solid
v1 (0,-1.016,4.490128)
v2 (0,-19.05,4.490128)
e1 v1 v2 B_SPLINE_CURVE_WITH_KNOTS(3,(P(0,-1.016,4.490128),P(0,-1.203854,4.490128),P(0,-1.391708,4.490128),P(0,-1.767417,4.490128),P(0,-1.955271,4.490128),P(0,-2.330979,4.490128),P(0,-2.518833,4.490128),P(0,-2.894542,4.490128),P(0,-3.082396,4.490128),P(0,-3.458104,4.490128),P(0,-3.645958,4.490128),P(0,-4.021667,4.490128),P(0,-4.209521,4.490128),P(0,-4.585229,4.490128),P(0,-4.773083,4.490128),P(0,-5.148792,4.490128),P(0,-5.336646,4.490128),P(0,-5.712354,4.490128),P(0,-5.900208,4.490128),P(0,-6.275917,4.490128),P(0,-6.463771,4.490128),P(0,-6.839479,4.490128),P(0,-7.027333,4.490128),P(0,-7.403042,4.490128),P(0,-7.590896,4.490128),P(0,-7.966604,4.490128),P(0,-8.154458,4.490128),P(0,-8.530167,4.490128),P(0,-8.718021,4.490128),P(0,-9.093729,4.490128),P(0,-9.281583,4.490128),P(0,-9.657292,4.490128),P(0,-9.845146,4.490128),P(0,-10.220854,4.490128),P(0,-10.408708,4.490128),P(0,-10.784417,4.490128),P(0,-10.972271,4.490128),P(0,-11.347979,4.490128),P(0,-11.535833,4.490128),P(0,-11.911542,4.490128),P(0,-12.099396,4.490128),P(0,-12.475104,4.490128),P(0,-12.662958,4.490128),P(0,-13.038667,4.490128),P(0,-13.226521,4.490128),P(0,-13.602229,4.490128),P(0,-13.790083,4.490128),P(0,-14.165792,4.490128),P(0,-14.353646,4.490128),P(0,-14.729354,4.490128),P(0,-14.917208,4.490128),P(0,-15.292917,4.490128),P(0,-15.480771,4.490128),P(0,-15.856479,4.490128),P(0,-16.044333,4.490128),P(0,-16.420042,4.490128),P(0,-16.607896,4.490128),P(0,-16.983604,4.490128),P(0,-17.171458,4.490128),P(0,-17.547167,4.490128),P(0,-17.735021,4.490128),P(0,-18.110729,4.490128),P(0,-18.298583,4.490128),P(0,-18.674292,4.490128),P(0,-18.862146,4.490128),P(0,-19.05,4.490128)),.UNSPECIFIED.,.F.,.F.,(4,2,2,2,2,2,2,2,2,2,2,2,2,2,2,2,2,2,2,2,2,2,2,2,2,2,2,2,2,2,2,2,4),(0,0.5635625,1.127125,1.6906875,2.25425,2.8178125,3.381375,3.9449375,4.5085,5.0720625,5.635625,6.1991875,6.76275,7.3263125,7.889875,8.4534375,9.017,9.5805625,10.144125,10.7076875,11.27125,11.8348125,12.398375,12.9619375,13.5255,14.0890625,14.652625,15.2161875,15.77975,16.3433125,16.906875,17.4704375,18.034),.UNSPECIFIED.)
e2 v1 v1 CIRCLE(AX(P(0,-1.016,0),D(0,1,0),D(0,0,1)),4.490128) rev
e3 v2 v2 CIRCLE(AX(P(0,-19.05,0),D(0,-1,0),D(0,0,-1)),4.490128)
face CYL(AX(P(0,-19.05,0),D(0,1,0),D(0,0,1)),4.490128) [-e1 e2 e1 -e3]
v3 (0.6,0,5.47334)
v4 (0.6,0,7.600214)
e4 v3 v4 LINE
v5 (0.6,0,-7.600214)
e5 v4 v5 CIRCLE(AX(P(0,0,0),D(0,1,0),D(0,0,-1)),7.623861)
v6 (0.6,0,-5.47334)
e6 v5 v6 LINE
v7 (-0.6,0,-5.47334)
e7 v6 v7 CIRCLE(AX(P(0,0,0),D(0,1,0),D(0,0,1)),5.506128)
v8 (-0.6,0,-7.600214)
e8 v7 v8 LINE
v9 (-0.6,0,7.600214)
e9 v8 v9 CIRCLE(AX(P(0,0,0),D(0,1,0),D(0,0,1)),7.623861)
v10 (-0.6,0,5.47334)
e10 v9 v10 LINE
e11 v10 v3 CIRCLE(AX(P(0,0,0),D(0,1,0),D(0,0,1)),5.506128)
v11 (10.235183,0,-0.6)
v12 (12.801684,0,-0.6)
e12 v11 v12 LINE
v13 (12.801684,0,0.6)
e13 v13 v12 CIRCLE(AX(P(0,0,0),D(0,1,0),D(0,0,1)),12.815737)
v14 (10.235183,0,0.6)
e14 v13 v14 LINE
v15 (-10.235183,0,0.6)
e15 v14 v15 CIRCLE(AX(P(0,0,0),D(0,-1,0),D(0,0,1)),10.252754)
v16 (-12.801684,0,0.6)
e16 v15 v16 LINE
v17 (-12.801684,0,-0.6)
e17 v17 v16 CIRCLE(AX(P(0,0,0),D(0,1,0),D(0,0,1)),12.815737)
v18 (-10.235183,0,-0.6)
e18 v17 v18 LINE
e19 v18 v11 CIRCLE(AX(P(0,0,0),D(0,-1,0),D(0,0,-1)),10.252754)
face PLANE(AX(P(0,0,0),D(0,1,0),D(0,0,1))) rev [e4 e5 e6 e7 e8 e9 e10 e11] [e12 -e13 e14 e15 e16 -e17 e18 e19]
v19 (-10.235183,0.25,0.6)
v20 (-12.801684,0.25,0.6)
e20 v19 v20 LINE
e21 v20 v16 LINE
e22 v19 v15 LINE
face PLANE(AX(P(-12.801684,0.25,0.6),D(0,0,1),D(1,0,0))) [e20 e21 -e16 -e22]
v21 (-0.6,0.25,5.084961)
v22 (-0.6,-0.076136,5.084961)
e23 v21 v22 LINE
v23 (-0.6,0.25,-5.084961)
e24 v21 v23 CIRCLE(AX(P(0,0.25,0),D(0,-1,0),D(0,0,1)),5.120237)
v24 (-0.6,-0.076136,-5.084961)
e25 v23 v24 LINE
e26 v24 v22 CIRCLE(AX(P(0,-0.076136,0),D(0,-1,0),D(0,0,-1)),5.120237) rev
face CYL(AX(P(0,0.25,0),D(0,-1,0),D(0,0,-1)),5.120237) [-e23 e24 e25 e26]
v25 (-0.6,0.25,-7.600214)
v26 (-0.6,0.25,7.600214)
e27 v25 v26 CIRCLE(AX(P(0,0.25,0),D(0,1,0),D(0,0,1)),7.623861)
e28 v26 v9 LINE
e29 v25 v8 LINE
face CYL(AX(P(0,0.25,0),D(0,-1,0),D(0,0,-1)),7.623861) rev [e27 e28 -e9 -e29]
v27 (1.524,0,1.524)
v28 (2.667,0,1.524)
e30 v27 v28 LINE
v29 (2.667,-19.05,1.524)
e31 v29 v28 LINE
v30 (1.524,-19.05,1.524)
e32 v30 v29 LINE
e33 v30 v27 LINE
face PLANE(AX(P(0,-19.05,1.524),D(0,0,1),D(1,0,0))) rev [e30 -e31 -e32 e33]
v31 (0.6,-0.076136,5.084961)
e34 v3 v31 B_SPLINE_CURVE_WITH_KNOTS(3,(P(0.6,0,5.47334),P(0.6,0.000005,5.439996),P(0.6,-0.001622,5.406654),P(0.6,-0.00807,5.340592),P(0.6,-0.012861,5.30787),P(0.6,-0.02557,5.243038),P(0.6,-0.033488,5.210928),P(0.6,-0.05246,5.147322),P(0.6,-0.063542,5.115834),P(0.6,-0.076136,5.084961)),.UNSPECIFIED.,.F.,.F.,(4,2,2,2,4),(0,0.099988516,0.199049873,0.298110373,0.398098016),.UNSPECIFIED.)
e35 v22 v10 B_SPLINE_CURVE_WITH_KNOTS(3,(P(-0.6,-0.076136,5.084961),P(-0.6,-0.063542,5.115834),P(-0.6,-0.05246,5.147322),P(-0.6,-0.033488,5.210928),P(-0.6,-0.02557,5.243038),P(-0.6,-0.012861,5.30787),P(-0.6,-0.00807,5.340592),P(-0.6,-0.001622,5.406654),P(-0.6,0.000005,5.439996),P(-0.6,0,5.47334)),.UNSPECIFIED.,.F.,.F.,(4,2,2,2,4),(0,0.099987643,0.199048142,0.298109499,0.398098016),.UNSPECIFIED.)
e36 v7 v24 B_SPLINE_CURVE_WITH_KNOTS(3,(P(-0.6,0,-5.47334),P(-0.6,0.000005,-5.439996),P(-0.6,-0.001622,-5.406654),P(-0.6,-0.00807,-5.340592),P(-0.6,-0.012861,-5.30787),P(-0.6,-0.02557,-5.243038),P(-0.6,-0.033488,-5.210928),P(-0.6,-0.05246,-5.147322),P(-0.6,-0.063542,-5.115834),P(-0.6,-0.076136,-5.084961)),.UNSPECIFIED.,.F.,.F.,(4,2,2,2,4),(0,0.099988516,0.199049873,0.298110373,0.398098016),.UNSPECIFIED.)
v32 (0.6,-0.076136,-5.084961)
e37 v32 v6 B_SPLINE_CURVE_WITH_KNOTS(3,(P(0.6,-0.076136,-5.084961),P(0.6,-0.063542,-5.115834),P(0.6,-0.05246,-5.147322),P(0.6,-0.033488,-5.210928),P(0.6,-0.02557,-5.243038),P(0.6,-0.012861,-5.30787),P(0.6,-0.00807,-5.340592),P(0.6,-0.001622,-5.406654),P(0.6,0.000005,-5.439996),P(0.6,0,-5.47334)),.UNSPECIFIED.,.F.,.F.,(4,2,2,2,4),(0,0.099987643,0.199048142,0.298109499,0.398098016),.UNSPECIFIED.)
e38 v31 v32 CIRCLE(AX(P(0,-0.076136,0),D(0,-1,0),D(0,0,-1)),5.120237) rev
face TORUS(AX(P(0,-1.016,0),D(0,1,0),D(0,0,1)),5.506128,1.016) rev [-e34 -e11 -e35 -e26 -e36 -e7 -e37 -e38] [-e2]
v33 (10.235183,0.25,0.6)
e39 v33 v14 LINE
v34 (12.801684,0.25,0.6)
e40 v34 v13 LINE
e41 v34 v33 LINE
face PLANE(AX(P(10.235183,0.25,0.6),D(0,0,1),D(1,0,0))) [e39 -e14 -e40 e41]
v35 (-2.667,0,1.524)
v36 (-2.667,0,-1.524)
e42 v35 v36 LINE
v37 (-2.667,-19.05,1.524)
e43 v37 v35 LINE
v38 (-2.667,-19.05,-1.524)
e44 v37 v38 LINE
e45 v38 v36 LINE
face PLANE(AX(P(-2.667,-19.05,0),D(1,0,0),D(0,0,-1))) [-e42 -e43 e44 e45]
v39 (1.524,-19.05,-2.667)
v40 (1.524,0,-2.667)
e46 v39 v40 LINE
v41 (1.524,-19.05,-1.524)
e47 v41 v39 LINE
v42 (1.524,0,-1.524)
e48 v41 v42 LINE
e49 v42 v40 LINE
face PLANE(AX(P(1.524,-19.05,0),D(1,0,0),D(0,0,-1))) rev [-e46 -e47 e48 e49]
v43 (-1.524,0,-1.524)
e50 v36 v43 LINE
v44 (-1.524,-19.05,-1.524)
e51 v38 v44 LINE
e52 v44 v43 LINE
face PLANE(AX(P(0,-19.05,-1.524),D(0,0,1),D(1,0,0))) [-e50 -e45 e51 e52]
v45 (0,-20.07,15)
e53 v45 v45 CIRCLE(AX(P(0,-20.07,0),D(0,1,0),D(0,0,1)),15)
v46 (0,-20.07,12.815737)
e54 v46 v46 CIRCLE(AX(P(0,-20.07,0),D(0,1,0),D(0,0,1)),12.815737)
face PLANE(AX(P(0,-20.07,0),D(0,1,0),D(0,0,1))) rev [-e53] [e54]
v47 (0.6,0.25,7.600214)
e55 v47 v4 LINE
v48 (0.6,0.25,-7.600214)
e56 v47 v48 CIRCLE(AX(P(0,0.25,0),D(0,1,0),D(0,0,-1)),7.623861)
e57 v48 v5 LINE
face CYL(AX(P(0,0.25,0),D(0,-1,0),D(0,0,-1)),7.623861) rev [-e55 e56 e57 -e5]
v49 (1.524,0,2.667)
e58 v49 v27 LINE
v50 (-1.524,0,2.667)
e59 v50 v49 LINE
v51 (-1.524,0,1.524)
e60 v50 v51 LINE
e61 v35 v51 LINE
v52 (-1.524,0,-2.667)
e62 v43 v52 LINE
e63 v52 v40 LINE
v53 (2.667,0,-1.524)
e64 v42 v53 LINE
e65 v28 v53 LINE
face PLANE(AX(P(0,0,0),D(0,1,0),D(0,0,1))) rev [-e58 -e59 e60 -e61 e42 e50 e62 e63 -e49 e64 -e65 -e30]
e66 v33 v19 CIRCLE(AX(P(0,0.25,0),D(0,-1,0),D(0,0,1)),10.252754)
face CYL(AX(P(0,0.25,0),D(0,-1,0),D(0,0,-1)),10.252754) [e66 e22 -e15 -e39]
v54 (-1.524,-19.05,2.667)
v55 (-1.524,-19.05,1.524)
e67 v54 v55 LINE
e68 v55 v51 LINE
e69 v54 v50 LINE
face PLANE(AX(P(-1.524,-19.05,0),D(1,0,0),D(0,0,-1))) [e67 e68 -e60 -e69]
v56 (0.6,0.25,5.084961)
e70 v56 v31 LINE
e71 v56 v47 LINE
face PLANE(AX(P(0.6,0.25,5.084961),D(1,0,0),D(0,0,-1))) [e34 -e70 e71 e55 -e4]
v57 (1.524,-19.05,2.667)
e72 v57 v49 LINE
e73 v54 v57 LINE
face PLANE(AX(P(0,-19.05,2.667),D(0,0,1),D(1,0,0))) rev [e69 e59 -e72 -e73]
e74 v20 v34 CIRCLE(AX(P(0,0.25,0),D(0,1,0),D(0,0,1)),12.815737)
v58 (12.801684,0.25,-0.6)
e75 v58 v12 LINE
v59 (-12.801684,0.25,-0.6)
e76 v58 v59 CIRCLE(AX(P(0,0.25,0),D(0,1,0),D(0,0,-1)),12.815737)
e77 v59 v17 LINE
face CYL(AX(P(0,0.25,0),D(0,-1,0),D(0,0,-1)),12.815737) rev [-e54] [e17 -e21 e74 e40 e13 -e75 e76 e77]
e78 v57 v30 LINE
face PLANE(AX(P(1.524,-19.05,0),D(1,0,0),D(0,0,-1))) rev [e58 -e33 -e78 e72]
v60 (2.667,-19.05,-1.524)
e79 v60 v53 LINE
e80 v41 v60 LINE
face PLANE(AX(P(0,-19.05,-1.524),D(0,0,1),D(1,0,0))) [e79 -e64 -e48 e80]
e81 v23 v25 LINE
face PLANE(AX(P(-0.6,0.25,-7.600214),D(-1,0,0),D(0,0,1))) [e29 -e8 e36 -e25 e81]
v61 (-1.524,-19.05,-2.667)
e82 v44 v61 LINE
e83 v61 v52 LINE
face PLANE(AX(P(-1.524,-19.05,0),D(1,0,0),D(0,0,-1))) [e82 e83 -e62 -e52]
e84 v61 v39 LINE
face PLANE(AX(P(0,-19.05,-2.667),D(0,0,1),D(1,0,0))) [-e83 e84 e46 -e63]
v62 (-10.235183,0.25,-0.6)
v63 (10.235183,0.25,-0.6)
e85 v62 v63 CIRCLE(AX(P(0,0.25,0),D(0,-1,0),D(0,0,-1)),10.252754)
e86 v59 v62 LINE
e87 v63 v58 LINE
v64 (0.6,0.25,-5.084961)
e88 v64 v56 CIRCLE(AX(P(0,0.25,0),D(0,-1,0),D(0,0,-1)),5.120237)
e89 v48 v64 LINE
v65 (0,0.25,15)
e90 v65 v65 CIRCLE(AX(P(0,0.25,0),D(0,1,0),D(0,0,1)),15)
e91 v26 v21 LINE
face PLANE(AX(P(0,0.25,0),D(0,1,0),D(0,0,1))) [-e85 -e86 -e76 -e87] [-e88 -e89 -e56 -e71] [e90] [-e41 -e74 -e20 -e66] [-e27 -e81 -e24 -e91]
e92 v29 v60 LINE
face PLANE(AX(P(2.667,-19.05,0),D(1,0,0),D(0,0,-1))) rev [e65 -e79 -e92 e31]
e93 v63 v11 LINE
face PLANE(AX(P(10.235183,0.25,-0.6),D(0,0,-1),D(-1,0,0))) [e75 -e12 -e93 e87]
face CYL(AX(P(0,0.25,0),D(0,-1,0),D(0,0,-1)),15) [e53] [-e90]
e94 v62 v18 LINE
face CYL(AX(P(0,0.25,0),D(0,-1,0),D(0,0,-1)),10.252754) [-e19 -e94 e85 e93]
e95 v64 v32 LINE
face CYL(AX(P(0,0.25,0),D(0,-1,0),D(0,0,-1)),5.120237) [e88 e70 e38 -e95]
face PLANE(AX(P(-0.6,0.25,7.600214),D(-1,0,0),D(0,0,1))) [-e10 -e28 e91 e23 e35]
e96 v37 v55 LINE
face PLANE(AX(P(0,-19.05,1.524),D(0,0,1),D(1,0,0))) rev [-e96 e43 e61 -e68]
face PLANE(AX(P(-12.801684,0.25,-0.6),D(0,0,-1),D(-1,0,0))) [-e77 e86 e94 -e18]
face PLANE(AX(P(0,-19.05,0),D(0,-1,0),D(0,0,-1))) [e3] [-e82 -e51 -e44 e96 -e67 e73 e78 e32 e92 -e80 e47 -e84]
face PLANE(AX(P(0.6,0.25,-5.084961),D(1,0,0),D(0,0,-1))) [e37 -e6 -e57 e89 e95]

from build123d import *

# Parameters (mm, degrees)
SKETCH1_R           = 15
BOSS_EXTRUDE1_DEPTH = 0.25
BOSS_EXTRUDE2_START = -20.32
SKETCH2_R           = 15
SKETCH2_R_2         = 12.815737343
BOSS_EXTRUDE2_DEPTH = 20.32
SKETCH3_R           = 4.490128061
BOSS_EXTRUDE3_DEPTH = 19.05
FILLET2_R           = 1.016


with BuildPart() as part:
    # Sketch1 → Boss-Extrude1 (new body)
    with BuildSketch(Plane(origin=(0, 0, 0), x_dir=(1, 0, 0), z_dir=(0, 1, 0))):
        with Locations(Location((0, 0, 0), (0, 0, 270))):
            Circle(SKETCH1_R)
        with BuildLine():
            Line((-12.801684406, 0.6), (-10.235182592, 0.6))
            ThreePointArc((-10.235182592, 0.6), (0, 10.252753907), (10.235182592, 0.6))
            Line((10.235182592, 0.6), (12.801684406, 0.6))
            ThreePointArc((12.801684406, 0.6), (0, 12.815737343), (-12.801684406, 0.6))
        make_face(mode=Mode.SUBTRACT)
        with BuildLine():
            Line((-0.6, 7.600213812), (-0.6, 5.084960781))
            ThreePointArc((-0.6, 5.084960781), (-5.120236922, 0), (-0.6, -5.084960781))
            Line((-0.6, -5.084960781), (-0.6, -7.600213812))
            ThreePointArc((-0.6, -7.600213812), (-7.623860569, 0), (-0.6, 7.600213812))
        make_face(mode=Mode.SUBTRACT)
        with BuildLine():
            Line((0.6, 5.084960781), (0.6, 7.600213812))
            ThreePointArc((0.6, 7.600213812), (7.623860569, 0), (0.6, -7.600213812))
            Line((0.6, -7.600213812), (0.6, -5.084960781))
            ThreePointArc((0.6, -5.084960781), (5.120236922, 0), (0.6, 5.084960781))
        make_face(mode=Mode.SUBTRACT)
        with BuildLine():
            Line((-12.801684406, -0.6), (-10.235182592, -0.6))
            ThreePointArc((-10.235182592, -0.6), (0, -10.252753907), (10.235182592, -0.6))
            Line((10.235182592, -0.6), (12.801684406, -0.6))
            ThreePointArc((12.801684406, -0.6), (0, -12.815737343), (-12.801684406, -0.6))
        make_face(mode=Mode.SUBTRACT)
    extrude(amount=BOSS_EXTRUDE1_DEPTH)

    # Sketch2 → Boss-Extrude2 (add)
    with BuildSketch(Plane(origin=(0, 0.25, 0), x_dir=(1, 0, 0), z_dir=(0, 1, 0)).offset(BOSS_EXTRUDE2_START)):
        with Locations(Location((0, 0, 0), (0, 0, 270))):
            Circle(SKETCH2_R)
        with Locations(Location((0, 0, 0), (0, 0, 2.683422553))):
            Circle(SKETCH2_R_2, mode=Mode.SUBTRACT)
    extrude(amount=BOSS_EXTRUDE2_DEPTH)

    # Sketch3 → Boss-Extrude3 (add)
    with BuildSketch(Plane.XZ):
        with Locations(Location((0, 0, 0), (0, 0, 90))):
            Circle(SKETCH3_R)
        Polygon((-1.524, 1.524), (-1.524, 2.667), (1.524, 2.667), (1.524, 1.524), (2.667, 1.524), (2.667, -1.524), (1.524, -1.524), (1.524, -2.667), (-1.524, -2.667), (-1.524, -1.524), (-2.667, -1.524), (-2.667, 1.524), align=None, mode=Mode.SUBTRACT)
    extrude(amount=BOSS_EXTRUDE3_DEPTH)

    # Fillet2
    # the kernel refuses this fillet: 1.016 mm, written as the material it adds along each edge
    with BuildSketch(Plane(origin=(0, 0, 0), x_dir=(0, 0, 1), z_dir=(1, 0, 0))) as fillet2_piece_1_section:
        with BuildLine():
            CenterArc((4.490128061 + FILLET2_R, FILLET2_R), FILLET2_R, 180, 90)
            Line((4.490128061, FILLET2_R), (4.490128061, 0))
            Line((4.490128061, 0), (4.490128061 + FILLET2_R, 0))
        make_face()
    fillet2_piece_1 = revolve(axis=Axis((0, 0, 0), (0, -1, 0)), mode=Mode.PRIVATE)
    fillet2_piece_1 = split(fillet2_piece_1, bisect_by=Plane(origin=(0.6, -0.022686873, 5.204418355), z_dir=(-1, 0, 0)), keep=Keep.TOP, mode=Mode.PRIVATE)
    fillet2_piece_1 = split(fillet2_piece_1, bisect_by=Plane(origin=(-0.6, -0.022686873, 5.204418355), z_dir=(1, 0, 0)), keep=Keep.TOP, mode=Mode.PRIVATE)
    add(fillet2_piece_1)
    with BuildSketch(Plane(origin=(0, 0, 0), x_dir=(0, 0, 1), z_dir=(1, 0, 0))) as fillet2_piece_2_section:
        with BuildLine():
            CenterArc((4.490128061 + FILLET2_R, FILLET2_R), FILLET2_R, 180, 90)
            Line((4.490128061, FILLET2_R), (4.490128061, 0))
            Line((4.490128061, 0), (4.490128061 + FILLET2_R, 0))
        make_face()
    fillet2_piece_2 = revolve(axis=Axis((0, 0, 0), (0, -1, 0)), mode=Mode.PRIVATE)
    fillet2_piece_2 = fillet2_piece_2 & Plane(origin=(0, -0.038068082, 0), x_dir=(0.11718207753036296, 0, 0.9931104473852181), z_dir=(0, -1, 0)) * Cylinder(5.120236922, 23, mode=Mode.PRIVATE)
    add(fillet2_piece_2)


solid = part.part
